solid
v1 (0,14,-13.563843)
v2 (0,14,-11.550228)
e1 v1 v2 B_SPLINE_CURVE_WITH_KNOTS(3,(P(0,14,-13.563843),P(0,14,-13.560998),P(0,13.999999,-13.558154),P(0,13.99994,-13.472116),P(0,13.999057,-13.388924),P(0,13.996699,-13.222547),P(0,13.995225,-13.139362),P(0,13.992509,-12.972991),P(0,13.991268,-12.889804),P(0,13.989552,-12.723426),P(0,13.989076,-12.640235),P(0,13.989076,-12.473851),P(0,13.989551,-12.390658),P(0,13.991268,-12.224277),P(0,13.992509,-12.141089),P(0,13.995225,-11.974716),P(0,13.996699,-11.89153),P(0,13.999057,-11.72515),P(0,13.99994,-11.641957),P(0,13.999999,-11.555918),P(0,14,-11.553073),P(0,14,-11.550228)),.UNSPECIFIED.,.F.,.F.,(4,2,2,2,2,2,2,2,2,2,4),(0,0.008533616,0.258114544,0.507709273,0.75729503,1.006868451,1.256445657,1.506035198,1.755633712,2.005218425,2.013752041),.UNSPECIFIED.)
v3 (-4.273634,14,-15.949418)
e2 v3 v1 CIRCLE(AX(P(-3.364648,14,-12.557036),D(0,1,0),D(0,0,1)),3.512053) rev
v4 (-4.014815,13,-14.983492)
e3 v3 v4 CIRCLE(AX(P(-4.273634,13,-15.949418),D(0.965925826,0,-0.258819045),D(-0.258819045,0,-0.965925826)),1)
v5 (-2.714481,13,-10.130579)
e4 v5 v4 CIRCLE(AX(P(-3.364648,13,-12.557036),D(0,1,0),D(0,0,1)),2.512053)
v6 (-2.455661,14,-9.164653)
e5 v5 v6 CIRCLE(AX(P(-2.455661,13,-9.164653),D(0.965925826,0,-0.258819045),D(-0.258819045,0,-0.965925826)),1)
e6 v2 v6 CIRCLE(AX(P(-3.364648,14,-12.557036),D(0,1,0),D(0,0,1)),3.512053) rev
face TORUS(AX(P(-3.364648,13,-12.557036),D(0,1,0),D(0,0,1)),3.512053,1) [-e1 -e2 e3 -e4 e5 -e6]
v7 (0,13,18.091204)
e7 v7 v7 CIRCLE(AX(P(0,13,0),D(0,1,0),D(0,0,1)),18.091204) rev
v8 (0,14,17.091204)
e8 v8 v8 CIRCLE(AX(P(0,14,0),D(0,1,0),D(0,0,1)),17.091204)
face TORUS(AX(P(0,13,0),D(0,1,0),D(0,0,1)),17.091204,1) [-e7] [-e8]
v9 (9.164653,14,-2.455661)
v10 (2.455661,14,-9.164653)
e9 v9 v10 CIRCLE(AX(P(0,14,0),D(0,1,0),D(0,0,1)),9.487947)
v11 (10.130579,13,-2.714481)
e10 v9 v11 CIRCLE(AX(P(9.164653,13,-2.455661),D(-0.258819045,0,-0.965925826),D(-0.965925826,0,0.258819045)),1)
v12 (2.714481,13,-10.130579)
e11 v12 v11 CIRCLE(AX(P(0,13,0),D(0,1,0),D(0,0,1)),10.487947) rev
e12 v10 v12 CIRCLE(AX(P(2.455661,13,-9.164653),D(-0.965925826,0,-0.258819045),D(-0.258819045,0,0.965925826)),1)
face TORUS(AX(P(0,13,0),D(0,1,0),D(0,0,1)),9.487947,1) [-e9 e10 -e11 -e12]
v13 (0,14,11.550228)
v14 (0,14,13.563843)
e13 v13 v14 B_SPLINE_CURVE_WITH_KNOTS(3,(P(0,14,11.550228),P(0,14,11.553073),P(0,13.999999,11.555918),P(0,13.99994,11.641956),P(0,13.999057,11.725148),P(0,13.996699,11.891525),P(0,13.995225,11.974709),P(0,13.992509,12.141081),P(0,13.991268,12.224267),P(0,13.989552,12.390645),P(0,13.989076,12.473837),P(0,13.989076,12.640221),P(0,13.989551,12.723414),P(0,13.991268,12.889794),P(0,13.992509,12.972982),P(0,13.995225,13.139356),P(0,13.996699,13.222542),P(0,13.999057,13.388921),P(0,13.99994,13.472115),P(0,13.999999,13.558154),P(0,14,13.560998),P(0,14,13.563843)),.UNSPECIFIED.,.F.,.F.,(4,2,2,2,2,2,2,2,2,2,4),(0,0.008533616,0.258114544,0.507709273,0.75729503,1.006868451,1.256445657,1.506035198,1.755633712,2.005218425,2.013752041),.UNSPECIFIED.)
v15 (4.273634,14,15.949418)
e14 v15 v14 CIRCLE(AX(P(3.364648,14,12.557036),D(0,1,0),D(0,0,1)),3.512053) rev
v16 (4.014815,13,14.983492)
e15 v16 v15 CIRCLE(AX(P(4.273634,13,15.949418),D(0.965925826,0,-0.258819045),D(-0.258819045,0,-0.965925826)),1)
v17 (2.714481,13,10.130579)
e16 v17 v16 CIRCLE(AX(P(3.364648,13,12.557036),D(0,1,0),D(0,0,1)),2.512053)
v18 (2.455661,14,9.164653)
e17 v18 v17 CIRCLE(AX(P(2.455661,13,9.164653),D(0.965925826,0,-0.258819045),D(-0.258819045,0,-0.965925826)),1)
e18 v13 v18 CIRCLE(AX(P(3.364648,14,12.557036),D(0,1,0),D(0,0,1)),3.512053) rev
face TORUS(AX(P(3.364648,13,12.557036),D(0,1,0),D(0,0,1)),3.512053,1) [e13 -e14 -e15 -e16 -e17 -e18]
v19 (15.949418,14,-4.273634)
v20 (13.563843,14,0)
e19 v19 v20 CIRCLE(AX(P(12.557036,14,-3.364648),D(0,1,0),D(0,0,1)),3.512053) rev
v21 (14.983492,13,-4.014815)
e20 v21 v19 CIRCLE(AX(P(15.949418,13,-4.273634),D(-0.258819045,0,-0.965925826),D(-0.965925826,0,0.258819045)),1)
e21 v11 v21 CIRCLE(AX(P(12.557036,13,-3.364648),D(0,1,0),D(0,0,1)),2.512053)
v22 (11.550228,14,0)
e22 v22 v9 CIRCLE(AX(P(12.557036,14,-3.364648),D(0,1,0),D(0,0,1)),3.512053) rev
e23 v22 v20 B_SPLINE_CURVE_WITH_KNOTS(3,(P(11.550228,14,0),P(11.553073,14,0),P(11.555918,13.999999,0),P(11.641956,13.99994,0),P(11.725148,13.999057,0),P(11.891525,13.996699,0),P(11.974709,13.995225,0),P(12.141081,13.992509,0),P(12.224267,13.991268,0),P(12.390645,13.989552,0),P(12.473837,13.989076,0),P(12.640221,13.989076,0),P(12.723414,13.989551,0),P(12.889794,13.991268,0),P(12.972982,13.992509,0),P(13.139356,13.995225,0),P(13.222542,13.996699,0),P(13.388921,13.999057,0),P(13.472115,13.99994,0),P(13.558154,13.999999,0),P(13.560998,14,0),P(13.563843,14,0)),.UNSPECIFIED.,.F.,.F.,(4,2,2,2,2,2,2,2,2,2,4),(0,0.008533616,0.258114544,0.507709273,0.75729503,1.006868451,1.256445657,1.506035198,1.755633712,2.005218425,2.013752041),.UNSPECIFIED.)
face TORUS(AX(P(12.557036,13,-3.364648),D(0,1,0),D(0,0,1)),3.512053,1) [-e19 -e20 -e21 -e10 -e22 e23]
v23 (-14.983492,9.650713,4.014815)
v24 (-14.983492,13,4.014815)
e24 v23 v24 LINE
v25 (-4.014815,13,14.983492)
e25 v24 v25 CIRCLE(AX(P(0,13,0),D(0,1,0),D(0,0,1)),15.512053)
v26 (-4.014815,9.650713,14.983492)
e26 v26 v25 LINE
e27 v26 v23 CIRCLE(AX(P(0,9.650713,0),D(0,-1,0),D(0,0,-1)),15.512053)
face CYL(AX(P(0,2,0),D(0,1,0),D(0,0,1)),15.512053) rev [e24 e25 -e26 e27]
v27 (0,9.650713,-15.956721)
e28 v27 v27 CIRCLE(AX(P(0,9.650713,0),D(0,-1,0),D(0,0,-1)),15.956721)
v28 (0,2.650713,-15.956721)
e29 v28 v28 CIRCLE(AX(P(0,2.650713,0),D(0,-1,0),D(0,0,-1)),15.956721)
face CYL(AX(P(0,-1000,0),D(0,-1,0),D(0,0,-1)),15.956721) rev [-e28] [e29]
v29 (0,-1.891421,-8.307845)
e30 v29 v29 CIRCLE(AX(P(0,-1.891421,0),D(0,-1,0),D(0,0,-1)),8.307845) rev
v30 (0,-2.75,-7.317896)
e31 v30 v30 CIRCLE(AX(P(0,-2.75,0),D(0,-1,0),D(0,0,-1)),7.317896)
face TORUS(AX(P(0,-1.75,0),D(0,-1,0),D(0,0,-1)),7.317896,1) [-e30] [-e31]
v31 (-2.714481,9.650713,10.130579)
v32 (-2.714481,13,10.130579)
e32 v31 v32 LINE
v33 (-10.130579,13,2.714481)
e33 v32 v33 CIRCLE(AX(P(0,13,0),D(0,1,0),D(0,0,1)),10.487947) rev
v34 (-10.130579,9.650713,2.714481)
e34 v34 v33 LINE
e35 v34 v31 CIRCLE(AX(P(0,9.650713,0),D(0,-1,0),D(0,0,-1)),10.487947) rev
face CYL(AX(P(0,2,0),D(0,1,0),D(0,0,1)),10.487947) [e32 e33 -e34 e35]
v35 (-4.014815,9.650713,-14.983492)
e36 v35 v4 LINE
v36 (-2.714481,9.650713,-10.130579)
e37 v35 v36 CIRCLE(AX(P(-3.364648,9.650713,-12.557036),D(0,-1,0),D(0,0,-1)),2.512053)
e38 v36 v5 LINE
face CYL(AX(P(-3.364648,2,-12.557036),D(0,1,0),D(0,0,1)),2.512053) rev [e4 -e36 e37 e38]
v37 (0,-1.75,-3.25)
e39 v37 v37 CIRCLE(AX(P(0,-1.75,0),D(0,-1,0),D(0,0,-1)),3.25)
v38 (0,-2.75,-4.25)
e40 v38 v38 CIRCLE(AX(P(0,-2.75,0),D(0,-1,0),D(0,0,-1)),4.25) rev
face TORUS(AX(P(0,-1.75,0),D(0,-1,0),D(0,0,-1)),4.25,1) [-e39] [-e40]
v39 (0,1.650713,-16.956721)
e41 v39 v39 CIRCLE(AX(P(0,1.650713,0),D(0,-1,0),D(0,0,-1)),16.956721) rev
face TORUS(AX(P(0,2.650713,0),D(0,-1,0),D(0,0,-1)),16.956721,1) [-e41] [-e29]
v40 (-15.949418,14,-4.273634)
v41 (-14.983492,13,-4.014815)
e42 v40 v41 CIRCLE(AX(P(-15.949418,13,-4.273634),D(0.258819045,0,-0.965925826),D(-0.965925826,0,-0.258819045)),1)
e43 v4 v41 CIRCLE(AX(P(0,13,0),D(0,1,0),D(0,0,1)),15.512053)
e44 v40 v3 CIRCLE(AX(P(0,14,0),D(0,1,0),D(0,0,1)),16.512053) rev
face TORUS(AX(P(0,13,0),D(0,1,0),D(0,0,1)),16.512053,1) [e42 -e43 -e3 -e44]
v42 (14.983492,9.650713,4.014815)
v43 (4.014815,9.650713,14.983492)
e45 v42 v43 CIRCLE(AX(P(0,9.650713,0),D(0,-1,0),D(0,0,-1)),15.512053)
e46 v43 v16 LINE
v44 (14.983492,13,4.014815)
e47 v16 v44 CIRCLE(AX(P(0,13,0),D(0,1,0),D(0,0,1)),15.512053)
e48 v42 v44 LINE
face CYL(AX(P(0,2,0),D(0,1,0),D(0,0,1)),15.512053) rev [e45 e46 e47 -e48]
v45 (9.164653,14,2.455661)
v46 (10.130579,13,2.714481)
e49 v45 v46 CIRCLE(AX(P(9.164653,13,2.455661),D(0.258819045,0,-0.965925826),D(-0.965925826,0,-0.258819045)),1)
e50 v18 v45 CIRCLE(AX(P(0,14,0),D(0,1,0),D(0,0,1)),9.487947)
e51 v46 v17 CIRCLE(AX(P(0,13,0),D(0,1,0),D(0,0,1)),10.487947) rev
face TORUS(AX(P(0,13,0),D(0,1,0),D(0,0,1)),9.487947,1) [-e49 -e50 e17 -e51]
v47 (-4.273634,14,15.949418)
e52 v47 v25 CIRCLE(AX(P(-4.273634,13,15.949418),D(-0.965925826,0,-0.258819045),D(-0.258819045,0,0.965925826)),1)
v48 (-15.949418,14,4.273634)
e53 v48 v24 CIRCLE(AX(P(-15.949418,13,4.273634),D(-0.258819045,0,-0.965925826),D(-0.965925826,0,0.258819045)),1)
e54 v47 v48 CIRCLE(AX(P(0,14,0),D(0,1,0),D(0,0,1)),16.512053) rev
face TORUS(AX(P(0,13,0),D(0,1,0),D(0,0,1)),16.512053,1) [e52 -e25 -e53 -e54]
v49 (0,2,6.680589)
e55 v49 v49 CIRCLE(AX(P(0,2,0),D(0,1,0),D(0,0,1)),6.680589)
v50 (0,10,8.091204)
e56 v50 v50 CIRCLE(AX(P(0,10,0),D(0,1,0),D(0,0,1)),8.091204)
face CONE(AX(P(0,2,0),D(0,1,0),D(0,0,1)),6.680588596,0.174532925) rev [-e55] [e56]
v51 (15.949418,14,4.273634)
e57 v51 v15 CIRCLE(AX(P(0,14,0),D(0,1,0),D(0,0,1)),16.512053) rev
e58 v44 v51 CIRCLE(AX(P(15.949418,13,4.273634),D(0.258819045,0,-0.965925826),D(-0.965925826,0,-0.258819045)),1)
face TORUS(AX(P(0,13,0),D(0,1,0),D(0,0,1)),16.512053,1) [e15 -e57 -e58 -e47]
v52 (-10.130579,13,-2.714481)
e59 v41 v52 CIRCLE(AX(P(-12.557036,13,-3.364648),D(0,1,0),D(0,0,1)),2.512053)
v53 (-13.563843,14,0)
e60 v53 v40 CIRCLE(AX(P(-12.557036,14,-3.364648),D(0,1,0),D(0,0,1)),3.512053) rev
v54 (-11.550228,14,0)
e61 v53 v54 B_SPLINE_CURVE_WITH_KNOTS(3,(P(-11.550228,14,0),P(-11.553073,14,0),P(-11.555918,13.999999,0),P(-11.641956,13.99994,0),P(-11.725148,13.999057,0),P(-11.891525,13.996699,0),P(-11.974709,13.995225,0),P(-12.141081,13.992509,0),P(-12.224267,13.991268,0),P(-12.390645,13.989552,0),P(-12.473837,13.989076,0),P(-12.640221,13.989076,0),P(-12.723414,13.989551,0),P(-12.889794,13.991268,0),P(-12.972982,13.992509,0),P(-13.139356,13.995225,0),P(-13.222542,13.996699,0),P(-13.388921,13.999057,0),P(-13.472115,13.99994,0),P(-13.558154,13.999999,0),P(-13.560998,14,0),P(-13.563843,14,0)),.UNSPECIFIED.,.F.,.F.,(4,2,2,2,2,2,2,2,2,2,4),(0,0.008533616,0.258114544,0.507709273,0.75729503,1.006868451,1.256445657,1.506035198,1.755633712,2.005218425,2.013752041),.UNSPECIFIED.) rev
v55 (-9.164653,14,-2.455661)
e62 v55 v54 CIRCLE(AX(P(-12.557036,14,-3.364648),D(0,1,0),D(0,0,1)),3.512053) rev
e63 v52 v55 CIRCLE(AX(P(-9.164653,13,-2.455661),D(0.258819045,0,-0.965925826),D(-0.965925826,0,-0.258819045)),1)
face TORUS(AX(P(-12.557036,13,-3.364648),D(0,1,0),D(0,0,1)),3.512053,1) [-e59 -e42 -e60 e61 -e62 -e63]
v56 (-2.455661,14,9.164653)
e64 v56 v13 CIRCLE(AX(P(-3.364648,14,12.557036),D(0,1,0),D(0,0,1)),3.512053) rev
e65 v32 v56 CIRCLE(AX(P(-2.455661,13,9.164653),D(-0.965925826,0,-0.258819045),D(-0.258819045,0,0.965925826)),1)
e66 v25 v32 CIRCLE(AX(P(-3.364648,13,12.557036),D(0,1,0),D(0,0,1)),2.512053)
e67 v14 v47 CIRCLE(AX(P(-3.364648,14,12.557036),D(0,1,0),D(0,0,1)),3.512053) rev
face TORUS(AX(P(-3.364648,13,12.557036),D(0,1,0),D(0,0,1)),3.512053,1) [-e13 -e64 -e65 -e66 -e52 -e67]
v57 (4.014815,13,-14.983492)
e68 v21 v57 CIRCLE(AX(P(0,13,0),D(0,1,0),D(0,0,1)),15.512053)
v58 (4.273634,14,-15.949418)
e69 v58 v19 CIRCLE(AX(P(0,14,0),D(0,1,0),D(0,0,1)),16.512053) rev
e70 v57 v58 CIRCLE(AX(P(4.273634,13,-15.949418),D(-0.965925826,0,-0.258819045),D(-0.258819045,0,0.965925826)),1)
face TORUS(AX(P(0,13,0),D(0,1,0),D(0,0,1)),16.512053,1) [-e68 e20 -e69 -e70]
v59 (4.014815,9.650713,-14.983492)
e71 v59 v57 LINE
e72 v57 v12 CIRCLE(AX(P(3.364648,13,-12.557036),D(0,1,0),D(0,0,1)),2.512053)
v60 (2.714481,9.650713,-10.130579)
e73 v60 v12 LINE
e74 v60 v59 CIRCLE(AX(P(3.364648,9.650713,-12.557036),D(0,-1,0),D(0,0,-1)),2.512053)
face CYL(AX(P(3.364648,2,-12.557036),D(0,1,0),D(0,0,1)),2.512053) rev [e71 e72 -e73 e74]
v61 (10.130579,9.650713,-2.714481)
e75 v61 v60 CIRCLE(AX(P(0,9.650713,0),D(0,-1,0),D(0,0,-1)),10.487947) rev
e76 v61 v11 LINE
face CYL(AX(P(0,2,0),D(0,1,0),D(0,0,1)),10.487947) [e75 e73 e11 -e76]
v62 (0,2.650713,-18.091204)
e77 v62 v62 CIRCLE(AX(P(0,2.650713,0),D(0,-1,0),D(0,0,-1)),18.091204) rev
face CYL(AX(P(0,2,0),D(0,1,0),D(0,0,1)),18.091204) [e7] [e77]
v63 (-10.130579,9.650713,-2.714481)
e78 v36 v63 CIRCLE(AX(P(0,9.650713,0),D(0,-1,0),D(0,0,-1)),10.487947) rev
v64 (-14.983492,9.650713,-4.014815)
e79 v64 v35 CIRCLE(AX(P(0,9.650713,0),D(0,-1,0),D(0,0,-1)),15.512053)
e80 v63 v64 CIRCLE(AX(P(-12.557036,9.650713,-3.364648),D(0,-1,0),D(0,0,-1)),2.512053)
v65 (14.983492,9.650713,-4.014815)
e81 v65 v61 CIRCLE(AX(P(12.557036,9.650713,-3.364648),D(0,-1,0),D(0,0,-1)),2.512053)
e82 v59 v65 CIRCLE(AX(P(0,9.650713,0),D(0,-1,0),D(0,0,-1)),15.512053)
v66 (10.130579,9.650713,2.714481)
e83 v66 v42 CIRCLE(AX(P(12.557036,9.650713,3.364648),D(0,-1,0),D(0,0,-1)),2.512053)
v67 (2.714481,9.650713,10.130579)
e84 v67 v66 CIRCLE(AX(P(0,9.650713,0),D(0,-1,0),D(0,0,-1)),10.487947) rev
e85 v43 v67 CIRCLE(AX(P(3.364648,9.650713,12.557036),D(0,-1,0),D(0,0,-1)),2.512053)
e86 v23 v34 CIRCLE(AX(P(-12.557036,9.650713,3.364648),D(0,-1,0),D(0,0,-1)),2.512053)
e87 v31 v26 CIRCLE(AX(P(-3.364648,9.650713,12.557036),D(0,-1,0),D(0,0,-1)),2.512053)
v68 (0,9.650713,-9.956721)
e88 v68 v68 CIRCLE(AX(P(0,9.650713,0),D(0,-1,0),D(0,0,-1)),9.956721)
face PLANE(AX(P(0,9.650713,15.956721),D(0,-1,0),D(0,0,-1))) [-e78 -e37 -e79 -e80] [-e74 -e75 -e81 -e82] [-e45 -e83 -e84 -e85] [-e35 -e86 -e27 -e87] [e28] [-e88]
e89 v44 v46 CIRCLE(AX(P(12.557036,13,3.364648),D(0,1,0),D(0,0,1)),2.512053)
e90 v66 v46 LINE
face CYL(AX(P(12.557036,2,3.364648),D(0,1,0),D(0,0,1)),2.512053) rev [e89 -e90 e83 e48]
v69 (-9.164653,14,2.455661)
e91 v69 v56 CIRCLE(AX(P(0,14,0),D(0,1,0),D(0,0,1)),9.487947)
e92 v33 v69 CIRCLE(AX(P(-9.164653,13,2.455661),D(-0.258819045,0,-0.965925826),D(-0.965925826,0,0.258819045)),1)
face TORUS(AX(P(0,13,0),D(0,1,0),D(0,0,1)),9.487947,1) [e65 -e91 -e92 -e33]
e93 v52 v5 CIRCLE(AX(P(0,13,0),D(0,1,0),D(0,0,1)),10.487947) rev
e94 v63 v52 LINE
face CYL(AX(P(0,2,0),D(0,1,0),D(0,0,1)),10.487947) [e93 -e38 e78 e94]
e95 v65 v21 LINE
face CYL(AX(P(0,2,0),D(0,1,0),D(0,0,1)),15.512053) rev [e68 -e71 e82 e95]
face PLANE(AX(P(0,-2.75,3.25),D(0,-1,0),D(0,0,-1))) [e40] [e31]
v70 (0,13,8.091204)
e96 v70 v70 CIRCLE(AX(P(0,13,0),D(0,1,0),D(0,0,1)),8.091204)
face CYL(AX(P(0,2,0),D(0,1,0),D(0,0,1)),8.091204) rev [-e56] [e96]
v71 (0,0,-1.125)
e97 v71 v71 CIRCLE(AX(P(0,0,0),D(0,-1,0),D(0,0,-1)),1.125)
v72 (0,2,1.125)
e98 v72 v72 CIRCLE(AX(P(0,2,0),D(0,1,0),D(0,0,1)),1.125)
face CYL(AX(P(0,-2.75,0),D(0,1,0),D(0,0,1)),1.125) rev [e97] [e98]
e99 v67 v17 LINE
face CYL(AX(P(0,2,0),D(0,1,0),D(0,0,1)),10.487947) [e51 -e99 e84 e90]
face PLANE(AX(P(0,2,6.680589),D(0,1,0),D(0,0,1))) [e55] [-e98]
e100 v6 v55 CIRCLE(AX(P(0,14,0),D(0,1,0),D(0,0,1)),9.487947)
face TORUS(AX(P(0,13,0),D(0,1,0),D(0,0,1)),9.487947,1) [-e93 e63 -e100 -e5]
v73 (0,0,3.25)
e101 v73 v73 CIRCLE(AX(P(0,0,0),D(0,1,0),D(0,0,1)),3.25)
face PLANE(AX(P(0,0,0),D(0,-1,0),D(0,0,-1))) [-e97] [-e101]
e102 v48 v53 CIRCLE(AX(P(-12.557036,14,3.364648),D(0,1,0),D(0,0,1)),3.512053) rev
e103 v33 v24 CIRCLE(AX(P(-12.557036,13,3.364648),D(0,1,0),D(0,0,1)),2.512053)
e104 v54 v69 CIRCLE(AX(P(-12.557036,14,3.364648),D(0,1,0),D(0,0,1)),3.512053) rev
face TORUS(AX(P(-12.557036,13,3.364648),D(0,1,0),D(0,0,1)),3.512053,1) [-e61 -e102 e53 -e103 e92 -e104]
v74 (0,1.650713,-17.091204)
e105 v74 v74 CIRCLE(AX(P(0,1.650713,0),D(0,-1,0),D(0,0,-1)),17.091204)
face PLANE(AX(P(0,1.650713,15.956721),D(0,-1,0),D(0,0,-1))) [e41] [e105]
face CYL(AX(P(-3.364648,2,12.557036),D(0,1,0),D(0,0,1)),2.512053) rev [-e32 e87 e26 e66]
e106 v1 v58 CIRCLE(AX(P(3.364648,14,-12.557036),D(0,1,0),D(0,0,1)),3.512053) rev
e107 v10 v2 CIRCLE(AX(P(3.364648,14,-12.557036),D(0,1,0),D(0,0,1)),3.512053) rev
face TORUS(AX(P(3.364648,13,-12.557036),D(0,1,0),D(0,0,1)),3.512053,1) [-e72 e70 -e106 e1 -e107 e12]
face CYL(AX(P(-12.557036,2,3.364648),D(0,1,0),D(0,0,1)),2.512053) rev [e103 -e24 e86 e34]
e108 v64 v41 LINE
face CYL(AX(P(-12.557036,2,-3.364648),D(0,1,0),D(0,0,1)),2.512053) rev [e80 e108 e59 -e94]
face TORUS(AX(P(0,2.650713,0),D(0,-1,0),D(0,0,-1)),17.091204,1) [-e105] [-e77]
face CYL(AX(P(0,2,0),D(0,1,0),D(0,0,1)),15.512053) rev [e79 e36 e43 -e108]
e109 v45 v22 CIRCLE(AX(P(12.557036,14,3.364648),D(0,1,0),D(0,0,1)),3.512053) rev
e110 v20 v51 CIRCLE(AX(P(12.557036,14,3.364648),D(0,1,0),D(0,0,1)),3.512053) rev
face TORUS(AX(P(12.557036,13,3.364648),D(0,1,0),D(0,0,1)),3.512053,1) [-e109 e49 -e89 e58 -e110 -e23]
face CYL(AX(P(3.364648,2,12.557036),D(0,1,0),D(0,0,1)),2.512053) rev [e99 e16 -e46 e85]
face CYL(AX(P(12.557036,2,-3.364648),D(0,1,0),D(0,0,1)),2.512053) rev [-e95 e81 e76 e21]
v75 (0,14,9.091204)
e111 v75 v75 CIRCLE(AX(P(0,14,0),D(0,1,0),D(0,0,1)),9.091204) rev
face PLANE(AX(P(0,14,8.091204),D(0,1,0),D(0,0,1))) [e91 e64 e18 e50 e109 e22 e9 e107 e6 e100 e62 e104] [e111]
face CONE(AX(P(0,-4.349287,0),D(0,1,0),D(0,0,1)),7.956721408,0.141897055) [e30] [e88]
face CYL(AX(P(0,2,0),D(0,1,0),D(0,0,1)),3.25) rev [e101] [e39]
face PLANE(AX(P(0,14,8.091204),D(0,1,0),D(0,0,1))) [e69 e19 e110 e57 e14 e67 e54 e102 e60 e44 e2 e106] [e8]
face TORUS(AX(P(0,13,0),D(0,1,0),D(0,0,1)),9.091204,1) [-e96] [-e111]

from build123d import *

# Parameters (mm, degrees)
CROQUIS2_R            = 1.125
CORTAR_EXTRUIR1_DEPTH = 29.259217191932034
CORTAR_EXTRUIR3_DEPTH = 12
REDONDEO1_R           = 1
REDONDEO2_R           = 1


with BuildPart() as part:
    # Croquis1 → Revolución1 (revolve)
    with BuildSketch(Plane(origin=(0, 0, 0), x_dir=(0, 0, -1), z_dir=(1, 0, 0))):
        Polygon((-6.680588596005596, 2), (-8.091204441673344, 10), (-8.091204441673344, 14), (-18.091204441673344, 13.999999999999998), (-18.09120444167334, -2.7500000000000018), (-3.2499999999999996, -2.75), (-3.25, 0), (0, 0), (-3.49e-15, 2.000000000004775), align=None)
    revolve(axis=Axis((0, 2.000000000004775, 3.49e-15), (0, -1, -1.75e-15)))

    # Croquis2 → Cortar-Extruir1 (cut, through all)
    with BuildSketch(Plane(origin=(0, 2.0000000000023936, 3.49e-15), x_dir=(1, 0, 0), z_dir=(0, 1, 1.75e-15))):
        with Locations(Location((0, 0, 0), (0, 0, 270))):
            Circle(CROQUIS2_R)
    extrude(amount=-CORTAR_EXTRUIR1_DEPTH, mode=Mode.SUBTRACT)

    # Croquis3 → Cortar-Revolución1 (revolve, cut)
    with BuildSketch(Plane(origin=(0, 0, 0), x_dir=(0, 0, -1), z_dir=(1, 0, 0)), mode=Mode.PRIVATE) as cortar_revoluci_n1_sk:
        Polygon((-15.956721408435095, -4.349286623479993), (-15.956721408435095, 9.650713376520008), (-9.956721408435095, 9.650713376520008), (-7.956721408435095, -4.349286623479992), align=None)
    revolve(cortar_revoluci_n1_sk.sketch.rotate(Axis((0, -1000, -3.49148e-12), (0, 1, 3.49e-15)), 180), axis=Axis((0, -1000, -3.49148e-12), (0, 1, 3.49e-15)), mode=Mode.SUBTRACT)

    # Croquis5 → Cortar-Extruir3 (cut)
    with BuildSketch(Plane(origin=(0, 14.000000000000021, 2.444e-14), x_dir=(1, 0, 0), z_dir=(0, 1, 1.75e-15))):
        with BuildLine():
            ThreePointArc((14.983492338128682, 4.014814671795773), (10.9686776663285, 10.968677666328498), (4.014814671795773, 14.983492338128682))
            ThreePointArc((4.014814671795773, 14.983492338128682), (0.9381909899598497, 13.207202827224593), (2.714480500863938, 10.13057914538867))
            ThreePointArc((2.714480500863938, 10.13057914538867), (7.416098644521734, 7.416098644521732), (10.13057914538867, 2.714480500863938))
            ThreePointArc((10.13057914538867, 2.714480500863938), (13.207202827224593, 0.9381909899598493), (14.983492338128682, 4.014814671795773))
        make_face()
        with BuildLine():
            ThreePointArc((4.014814671795721, -14.983492338128697), (10.968677666328434, -10.968677666328524), (14.983492338128668, -4.014814671795825))
            ThreePointArc((14.983492338128668, -4.014814671795825), (13.20720282722459, -0.9381909899598955), (10.130579145388662, -2.7144805008639734))
            ThreePointArc((10.130579145388662, -2.7144805008639734), (7.4160986445216786, -7.416098644521746), (2.7144805008639024, -10.13057914538868))
            ThreePointArc((2.7144805008639024, -10.13057914538868), (0.9381909899598018, -13.207202827224597), (4.014814671795721, -14.983492338128697))
        make_face()
        with BuildLine():
            ThreePointArc((-14.98349233812871, -4.014814671795668), (-10.96867766632859, -10.968677666328437), (-4.014814671795878, -14.983492338128654))
            ThreePointArc((-4.014814671795878, -14.983492338128654), (-0.9381909899599408, -13.207202827224586), (-2.7144805008640085, -10.130579145388651))
            ThreePointArc((-2.7144805008640085, -10.130579145388651), (-7.416098644521799, -7.416098644521696), (-10.13057914538869, -2.7144805008638673))
            ThreePointArc((-10.13057914538869, -2.7144805008638673), (-13.207202827224602, -0.9381909899597565), (-14.98349233812871, -4.014814671795668))
        make_face()
        with BuildLine():
            ThreePointArc((-4.014814671795616, 14.983492338128723), (-10.968677666328427, 10.96867766632864), (-14.983492338128642, 4.01481467179593))
            ThreePointArc((-14.983492338128642, 4.01481467179593), (-13.207202827224584, 0.938190989959987), (-10.130579145388642, 2.7144805008640445))
            ThreePointArc((-10.130579145388642, 2.7144805008640445), (-7.416098644521696, 7.416098644521837), (-2.7144805008638317, 10.130579145388698))
            ThreePointArc((-2.7144805008638317, 10.130579145388698), (-0.9381909899597112, 13.207202827224602), (-4.014814671795616, 14.983492338128723))
        make_face()
    extrude(amount=-CORTAR_EXTRUIR3_DEPTH, mode=Mode.SUBTRACT)

    # Redondeo1
    # the kernel refuses this fillet: 1 mm, written as the material it takes off along each edge
    with BuildSketch(Plane(origin=(0, -2.74999999999997, -9.6e-15), x_dir=(1.2e-16, 3.47e-15, -1), z_dir=(-1, 0, -1.2e-16))) as redondeo1_piece_1:
        with BuildLine():
            CenterArc((8.185190926075093 - REDONDEO1_R * 0.867295401695, -REDONDEO1_R), REDONDEO1_R, 8.130102354154952, 81.86989764584513)
            Line((8.185190926075093 + REDONDEO1_R * 0.122654091966, -REDONDEO1_R * 0.858578643763), (8.185190926075093, 0))
            Line((8.185190926075093, 0), (8.185190926075093 - REDONDEO1_R * 0.867295401695, 1.253e-14))
        make_face()
    revolve(axis=Axis((0, -2.74999999999997, -9.6e-15), (0, -1, -3.49e-15)), mode=Mode.SUBTRACT)
    with BuildSketch(Plane(origin=(12.557035741758677, 14.000000000000027, -3.364647586329831), x_dir=(-0.9659258262891276, 0, 0.25881904510229936), z_dir=(-0.25881904510229936, 1.6862559986094765e-15, -0.9659258262891276))) as redondeo1_piece_2:
        with BuildLine():
            CenterArc((2.512052717020636 + REDONDEO1_R, -REDONDEO1_R), REDONDEO1_R, 89.99999999999997, 89.99999999999963)
            Line((2.5120527170206355, -REDONDEO1_R), (2.512052717020636, 0))
            Line((2.512052717020636, 0), (2.512052717020636 + REDONDEO1_R, -8.88e-15))
        make_face()
    revolve(axis=Axis((12.557035741758677, 14.000000000000027, -3.364647586329831), (0, 1, 1.75e-15)), revolution_arc=180, mode=Mode.SUBTRACT)
    with BuildSketch(Plane(origin=(-5.551e-14, 14.000000000000021, 7.862e-14), x_dir=(0.9659258262891277, 0, -0.2588190451022993), z_dir=(0.2588190451022993, -1.6862559986094767e-15, 0.9659258262891277))) as redondeo1_piece_3:
        with BuildLine():
            CenterArc((15.512052717020714 + REDONDEO1_R, -REDONDEO1_R), REDONDEO1_R, 90, 89.99999999999957)
            Line((15.512052717020714, -REDONDEO1_R), (15.512052717020714, 0))
            Line((15.512052717020714, 0), (15.512052717020714 + REDONDEO1_R, -7.56e-15))
        make_face()
    revolve(axis=Axis((-5.551e-14, 14.000000000000021, 7.862e-14), (0, 1, 1.75e-15)), revolution_arc=60.00000000002627, mode=Mode.SUBTRACT)
    with BuildSketch(Plane(origin=(3.3646475863298555, 14.000000000000043, -12.557035741758652), x_dir=(0.25881904510229936, 2.1214007501089294e-15, -0.9659258262891276), z_dir=(0.9659258262891276, 0, 0.25881904510229936))) as redondeo1_piece_4:
        with BuildLine():
            CenterArc((2.512052717020636 + REDONDEO1_R, -REDONDEO1_R), REDONDEO1_R, 89.99999999999997, 89.99999999999972)
            Line((2.5120527170206355, -REDONDEO1_R), (2.512052717020636, 0))
            Line((2.512052717020636, 0), (2.512052717020636 + REDONDEO1_R, -7.45e-15))
        make_face()
    revolve(axis=Axis((3.3646475863298555, 14.000000000000043, -12.557035741758652), (0, 1, 1.75e-15)), revolution_arc=180, mode=Mode.SUBTRACT)
    with BuildSketch(Plane(origin=(-5.462e-14, 14.000000000000021, 7.818e-14), x_dir=(0.25881904510229936, 1.693712593581629e-15, -0.9659258262891276), z_dir=(-0.9659258262891276, 0, -0.25881904510229936))) as redondeo1_piece_5:
        with BuildLine():
            CenterArc((10.48794728297944 - REDONDEO1_R, REDONDEO1_R), REDONDEO1_R, 270, 89.99999999999959)
            Line((10.48794728297944, REDONDEO1_R), (10.48794728297944, 0))
            Line((10.48794728297944, 0), (10.48794728297944 - REDONDEO1_R, 7.19e-15))
        make_face()
    revolve(axis=Axis((-5.462e-14, 14.000000000000021, 7.818e-14), (0, -1, -1.75e-15)), revolution_arc=60.00000000002628, mode=Mode.SUBTRACT)
    with BuildSketch(Plane(origin=(3.36464758632981, 14, 12.557035741758714), x_dir=(-0.25881904510229536, 1.4142671667392858e-15, -0.9659258262891287), z_dir=(0.9659258262891287, 0, -0.25881904510229536))) as redondeo1_piece_6:
        with BuildLine():
            CenterArc((2.512052717020637 + REDONDEO1_R, -REDONDEO1_R), REDONDEO1_R, 90.00000000000003, 89.9999999999996)
            Line((2.5120527170206373, -REDONDEO1_R), (2.512052717020637, 0))
            Line((2.512052717020637, 0), (2.512052717020637 + REDONDEO1_R, -6.74e-15))
        make_face()
    revolve(axis=Axis((3.36464758632981, 14, 12.557035741758714), (0, 1, 1.75e-15)), revolution_arc=180.00000000000009, mode=Mode.SUBTRACT)
    with BuildSketch(Plane(origin=(-2.0339e-13, 14.000000000000021, -1.7762e-13), x_dir=(0.2588190451023025, -1.7177193165264736e-15, 0.9659258262891268), z_dir=(-0.9659258262891268, 0, 0.2588190451023025))) as redondeo1_piece_7:
        with BuildLine():
            CenterArc((15.512052717020895 + REDONDEO1_R, -REDONDEO1_R), REDONDEO1_R, 90, 89.9999999999996)
            Line((15.512052717020895, -REDONDEO1_R), (15.512052717020895, 0))
            Line((15.512052717020895, 0), (15.512052717020895 + REDONDEO1_R, -7.16e-15))
        make_face()
    revolve(axis=Axis((-2.0339e-13, 14.000000000000021, -1.7762e-13), (0, 1, 1.75e-15)), revolution_arc=60.0000000000255, mode=Mode.SUBTRACT)
    with BuildSketch(Plane(origin=(12.557035741758664, 14.000000000000016, 3.3646475863299234), x_dir=(0.9659258262891267, 0, 0.2588190451023027), z_dir=(-0.2588190451023027, -1.6862559986094747e-15, 0.9659258262891267))) as redondeo1_piece_8:
        with BuildLine():
            CenterArc((2.5120527170206364 + REDONDEO1_R, -REDONDEO1_R), REDONDEO1_R, 90.00000000000003, 89.9999999999996)
            Line((2.512052717020637, -REDONDEO1_R), (2.5120527170206364, 0))
            Line((2.5120527170206364, 0), (2.5120527170206364 + REDONDEO1_R, -6.4e-15))
        make_face()
    revolve(axis=Axis((12.557035741758664, 14.000000000000016, 3.3646475863299234), (0, 1, 1.75e-15)), revolution_arc=180, mode=Mode.SUBTRACT)
    with BuildSketch(Plane(origin=(-2.0961e-13, 14.000000000000021, -1.865e-13), x_dir=(0.965925826289124, 0, 0.25881904510231285), z_dir=(0.25881904510231285, 1.6862559986094702e-15, -0.965925826289124))) as redondeo1_piece_9:
        with BuildLine():
            CenterArc((10.48794728297963 - REDONDEO1_R, REDONDEO1_R), REDONDEO1_R, 270, 89.99999999999966)
            Line((10.48794728297963, REDONDEO1_R), (10.48794728297963, 0))
            Line((10.48794728297963, 0), (10.48794728297963 - REDONDEO1_R, 5.84e-15))
        make_face()
    revolve(axis=Axis((-2.0961e-13, 14.000000000000021, -1.865e-13), (0, -1, -1.75e-15)), revolution_arc=60.00000000002507, mode=Mode.SUBTRACT)
    with BuildSketch(Plane(origin=(-12.557035741758702, 14.000000000000016, 3.36464758632979), x_dir=(0.9659258262891296, 0, -0.2588190451022917), z_dir=(0.2588190451022917, -1.68625599860948e-15, 0.9659258262891296))) as redondeo1_piece_10:
        with BuildLine():
            CenterArc((2.512052717020636 + REDONDEO1_R, -REDONDEO1_R), REDONDEO1_R, 90.00000000000003, 89.99999999999957)
            Line((2.512052717020636, -REDONDEO1_R), (2.512052717020636, 0))
            Line((2.512052717020636, 0), (2.512052717020636 + REDONDEO1_R, -5.33e-15))
        make_face()
    revolve(axis=Axis((-12.557035741758702, 14.000000000000016, 3.36464758632979), (0, 1, 1.75e-15)), revolution_arc=180.0000000000001, mode=Mode.SUBTRACT)
    with BuildSketch(Plane(origin=(-5.329e-14, 14.000000000000021, 7.684e-14), x_dir=(-0.9659258262891307, 0, 0.25881904510228787), z_dir=(-0.25881904510228787, 1.6862559986094818e-15, -0.9659258262891307))) as redondeo1_piece_11:
        with BuildLine():
            CenterArc((15.51205271702058 + REDONDEO1_R, -REDONDEO1_R), REDONDEO1_R, 90, 89.99999999999963)
            Line((15.51205271702058, -REDONDEO1_R), (15.51205271702058, 0))
            Line((15.51205271702058, 0), (15.51205271702058 + REDONDEO1_R, -6.65e-15))
        make_face()
    revolve(axis=Axis((-5.329e-14, 14.000000000000021, 7.684e-14), (0, 1, 1.75e-15)), revolution_arc=60.00000000002684, mode=Mode.SUBTRACT)
    with BuildSketch(Plane(origin=(-3.3646475863299434, 14, 12.557035741758677), x_dir=(-0.25881904510230597, -2.1214007501089287e-15, 0.9659258262891258), z_dir=(-0.9659258262891258, 0, -0.25881904510230597))) as redondeo1_piece_12:
        with BuildLine():
            CenterArc((2.512052717020637 + REDONDEO1_R, -REDONDEO1_R), REDONDEO1_R, 90.00000000000003, 89.99999999999949)
            Line((2.5120527170206373, -REDONDEO1_R), (2.512052717020637, 0))
            Line((2.512052717020637, 0), (2.512052717020637 + REDONDEO1_R, -6.76e-15))
        make_face()
    revolve(axis=Axis((-3.3646475863299434, 14, 12.557035741758677), (0, 1, 1.75e-15)), revolution_arc=179.99999999999997, mode=Mode.SUBTRACT)
    with BuildSketch(Plane(origin=(-5.951e-14, 14.000000000000021, 8.128e-14), x_dir=(-0.25881904510229853, -1.6937125935816514e-15, 0.9659258262891278), z_dir=(0.9659258262891278, 0, 0.25881904510229853))) as redondeo1_piece_13:
        with BuildLine():
            CenterArc((10.4879472829793 - REDONDEO1_R, REDONDEO1_R), REDONDEO1_R, 270, 89.99999999999959)
            Line((10.4879472829793, REDONDEO1_R), (10.4879472829793, 0))
            Line((10.4879472829793, 0), (10.4879472829793 - REDONDEO1_R, 7.02e-15))
        make_face()
    revolve(axis=Axis((-5.951e-14, 14.000000000000021, 8.128e-14), (0, -1, -1.75e-15)), revolution_arc=60.00000000002714, mode=Mode.SUBTRACT)
    with BuildSketch(Plane(origin=(0, 14.000000000000014, 2.444e-14), x_dir=(0, -1.76e-15, 1), z_dir=(1, 0, 0))) as redondeo1_piece_14:
        with BuildLine():
            CenterArc((8.09120444167332 + REDONDEO1_R, REDONDEO1_R), REDONDEO1_R, 180, 89.9999999999996)
            Line((8.09120444167332 + REDONDEO1_R, 2e-17), (8.09120444167332, 0))
            Line((8.09120444167332, 0), (8.091204441673327, REDONDEO1_R))
        make_face()
    revolve(axis=Axis((0, 14.000000000000014, 2.444e-14), (0, -1, -1.75e-15)), mode=Mode.SUBTRACT)
    with BuildSketch(Plane(origin=(-3.364647586329724, 14.000000000000043, -12.557035741758686), x_dir=(0.25881904510228926, -1.414267166739286e-15, 0.9659258262891303), z_dir=(-0.9659258262891303, 0, 0.25881904510228926))) as redondeo1_piece_15:
        with BuildLine():
            CenterArc((2.512052717020636 + REDONDEO1_R, -REDONDEO1_R), REDONDEO1_R, 89.99999999999997, 89.99999999999963)
            Line((2.5120527170206355, -REDONDEO1_R), (2.512052717020636, 0))
            Line((2.512052717020636, 0), (2.512052717020636 + REDONDEO1_R, -7.47e-15))
        make_face()
    revolve(axis=Axis((-3.364647586329724, 14.000000000000043, -12.557035741758686), (0, 1, 1.75e-15)), revolution_arc=180, mode=Mode.SUBTRACT)
    with BuildSketch(Plane(origin=(-2.0384e-13, 14.000000000000021, -1.7762e-13), x_dir=(-0.2588190451022777, 1.7177193165265286e-15, -0.9659258262891334), z_dir=(0.9659258262891334, 0, -0.2588190451022777))) as redondeo1_piece_16:
        with BuildLine():
            CenterArc((15.512052717020396 + REDONDEO1_R, -REDONDEO1_R), REDONDEO1_R, 90, 89.9999999999996)
            Line((15.512052717020396, -REDONDEO1_R), (15.512052717020396, 0))
            Line((15.512052717020396, 0), (15.512052717020396 + REDONDEO1_R, -7.05e-15))
        make_face()
    revolve(axis=Axis((-2.0384e-13, 14.000000000000021, -1.7762e-13), (0, 1, 1.75e-15)), revolution_arc=60.00000000002762, mode=Mode.SUBTRACT)
    with BuildSketch(Plane(origin=(-12.557035741758643, 14.000000000000027, -3.3646475863299616), x_dir=(-0.9659258262891247, 0, -0.2588190451023098), z_dir=(0.2588190451023098, 1.6862559986094712e-15, -0.9659258262891247))) as redondeo1_piece_17:
        with BuildLine():
            CenterArc((2.512052717020636 + REDONDEO1_R, -REDONDEO1_R), REDONDEO1_R, 89.99999999999997, 89.9999999999996)
            Line((2.5120527170206355, -REDONDEO1_R), (2.512052717020636, 0))
            Line((2.512052717020636, 0), (2.512052717020636 + REDONDEO1_R, -7.81e-15))
        make_face()
    revolve(axis=Axis((-12.557035741758643, 14.000000000000027, -3.3646475863299616), (0, 1, 1.75e-15)), revolution_arc=180.00000000000009, mode=Mode.SUBTRACT)
    with BuildSketch(Plane(origin=(-1.9496e-13, 14.000000000000021, -1.6741e-13), x_dir=(-0.9659258262891292, 0, -0.25881904510229353), z_dir=(-0.25881904510229353, -1.686255998609479e-15, 0.9659258262891292))) as redondeo1_piece_18:
        with BuildLine():
            CenterArc((10.487947282979135 - REDONDEO1_R, REDONDEO1_R), REDONDEO1_R, 270, 89.99999999999952)
            Line((10.487947282979135, REDONDEO1_R), (10.487947282979135, 0))
            Line((10.487947282979135, 0), (10.487947282979135 - REDONDEO1_R, 8.37e-15))
        make_face()
    revolve(axis=Axis((-1.9496e-13, 14.000000000000021, -1.6741e-13), (0, -1, -1.75e-15)), revolution_arc=60.00000000002817, mode=Mode.SUBTRACT)
    with BuildSketch(Plane(origin=(0, 14.00000000000003, 2.444e-14), x_dir=(0, -1.77e-15, 1), z_dir=(1, 0, 0))) as redondeo1_piece_19:
        with BuildLine():
            CenterArc((18.09120444167332 - REDONDEO1_R, REDONDEO1_R), REDONDEO1_R, 270, 89.99999999999909)
            Line((18.09120444167332, REDONDEO1_R), (18.09120444167332, 0))
            Line((18.09120444167332, 0), (18.09120444167332 - REDONDEO1_R, 1.598e-14))
        make_face()
    revolve(axis=Axis((0, 14.00000000000003, 2.444e-14), (0, -1, -1.75e-15)), mode=Mode.SUBTRACT)
    with BuildSketch(Plane(origin=(0, -2.7499999999999947, -4.8e-15), x_dir=(0, -1.78e-15, 1), z_dir=(1, 0, 0))) as redondeo1_piece_20:
        with BuildLine():
            CenterArc((3.2500000000000044 + REDONDEO1_R, -REDONDEO1_R), REDONDEO1_R, 90.00000000000006, 89.99999999999994)
            Line((3.2500000000000044 + REDONDEO1_R, 0), (3.2500000000000044, 0))
            Line((3.2500000000000044, 0), (3.250000000000005, -REDONDEO1_R))
        make_face()
    revolve(axis=Axis((0, -2.7499999999999947, -4.8e-15), (0, -1, -1.75e-15)), mode=Mode.SUBTRACT)

    # Croquis6 → Cortar-Revolución2 (revolve, cut)
    with BuildSketch(Plane(origin=(0, 0, 0), x_dir=(0, 0, -1), z_dir=(1, 0, 0)), mode=Mode.PRIVATE) as cortar_revoluci_n2_sk:
        Polygon((-18.091204441673817, -4.3492866234800145), (-15.956721408463517, -4.3492866234800145), (-15.956721408463517, 1.6507133765199862), (-18.091204441673355, 1.650713376519986), align=None)
    revolve(cortar_revoluci_n2_sk.sketch.rotate(Axis((0, -1000, -3.49148e-12), (0, 1, 3.49e-15)), 180), axis=Axis((0, -1000, -3.49148e-12), (0, 1, 3.49e-15)), mode=Mode.SUBTRACT)

    # Redondeo2
    redondeo2_edges = [part.edges().sort_by_distance(p)[0] for p in [
        (4.87e-15, 1.6507133765200654, -18.091204441673344),
        (-3.91e-15, 1.6507133765200603, 15.956721408463517),
    ]]
    fillet(redondeo2_edges, radius=REDONDEO2_R)


solid = part.part
